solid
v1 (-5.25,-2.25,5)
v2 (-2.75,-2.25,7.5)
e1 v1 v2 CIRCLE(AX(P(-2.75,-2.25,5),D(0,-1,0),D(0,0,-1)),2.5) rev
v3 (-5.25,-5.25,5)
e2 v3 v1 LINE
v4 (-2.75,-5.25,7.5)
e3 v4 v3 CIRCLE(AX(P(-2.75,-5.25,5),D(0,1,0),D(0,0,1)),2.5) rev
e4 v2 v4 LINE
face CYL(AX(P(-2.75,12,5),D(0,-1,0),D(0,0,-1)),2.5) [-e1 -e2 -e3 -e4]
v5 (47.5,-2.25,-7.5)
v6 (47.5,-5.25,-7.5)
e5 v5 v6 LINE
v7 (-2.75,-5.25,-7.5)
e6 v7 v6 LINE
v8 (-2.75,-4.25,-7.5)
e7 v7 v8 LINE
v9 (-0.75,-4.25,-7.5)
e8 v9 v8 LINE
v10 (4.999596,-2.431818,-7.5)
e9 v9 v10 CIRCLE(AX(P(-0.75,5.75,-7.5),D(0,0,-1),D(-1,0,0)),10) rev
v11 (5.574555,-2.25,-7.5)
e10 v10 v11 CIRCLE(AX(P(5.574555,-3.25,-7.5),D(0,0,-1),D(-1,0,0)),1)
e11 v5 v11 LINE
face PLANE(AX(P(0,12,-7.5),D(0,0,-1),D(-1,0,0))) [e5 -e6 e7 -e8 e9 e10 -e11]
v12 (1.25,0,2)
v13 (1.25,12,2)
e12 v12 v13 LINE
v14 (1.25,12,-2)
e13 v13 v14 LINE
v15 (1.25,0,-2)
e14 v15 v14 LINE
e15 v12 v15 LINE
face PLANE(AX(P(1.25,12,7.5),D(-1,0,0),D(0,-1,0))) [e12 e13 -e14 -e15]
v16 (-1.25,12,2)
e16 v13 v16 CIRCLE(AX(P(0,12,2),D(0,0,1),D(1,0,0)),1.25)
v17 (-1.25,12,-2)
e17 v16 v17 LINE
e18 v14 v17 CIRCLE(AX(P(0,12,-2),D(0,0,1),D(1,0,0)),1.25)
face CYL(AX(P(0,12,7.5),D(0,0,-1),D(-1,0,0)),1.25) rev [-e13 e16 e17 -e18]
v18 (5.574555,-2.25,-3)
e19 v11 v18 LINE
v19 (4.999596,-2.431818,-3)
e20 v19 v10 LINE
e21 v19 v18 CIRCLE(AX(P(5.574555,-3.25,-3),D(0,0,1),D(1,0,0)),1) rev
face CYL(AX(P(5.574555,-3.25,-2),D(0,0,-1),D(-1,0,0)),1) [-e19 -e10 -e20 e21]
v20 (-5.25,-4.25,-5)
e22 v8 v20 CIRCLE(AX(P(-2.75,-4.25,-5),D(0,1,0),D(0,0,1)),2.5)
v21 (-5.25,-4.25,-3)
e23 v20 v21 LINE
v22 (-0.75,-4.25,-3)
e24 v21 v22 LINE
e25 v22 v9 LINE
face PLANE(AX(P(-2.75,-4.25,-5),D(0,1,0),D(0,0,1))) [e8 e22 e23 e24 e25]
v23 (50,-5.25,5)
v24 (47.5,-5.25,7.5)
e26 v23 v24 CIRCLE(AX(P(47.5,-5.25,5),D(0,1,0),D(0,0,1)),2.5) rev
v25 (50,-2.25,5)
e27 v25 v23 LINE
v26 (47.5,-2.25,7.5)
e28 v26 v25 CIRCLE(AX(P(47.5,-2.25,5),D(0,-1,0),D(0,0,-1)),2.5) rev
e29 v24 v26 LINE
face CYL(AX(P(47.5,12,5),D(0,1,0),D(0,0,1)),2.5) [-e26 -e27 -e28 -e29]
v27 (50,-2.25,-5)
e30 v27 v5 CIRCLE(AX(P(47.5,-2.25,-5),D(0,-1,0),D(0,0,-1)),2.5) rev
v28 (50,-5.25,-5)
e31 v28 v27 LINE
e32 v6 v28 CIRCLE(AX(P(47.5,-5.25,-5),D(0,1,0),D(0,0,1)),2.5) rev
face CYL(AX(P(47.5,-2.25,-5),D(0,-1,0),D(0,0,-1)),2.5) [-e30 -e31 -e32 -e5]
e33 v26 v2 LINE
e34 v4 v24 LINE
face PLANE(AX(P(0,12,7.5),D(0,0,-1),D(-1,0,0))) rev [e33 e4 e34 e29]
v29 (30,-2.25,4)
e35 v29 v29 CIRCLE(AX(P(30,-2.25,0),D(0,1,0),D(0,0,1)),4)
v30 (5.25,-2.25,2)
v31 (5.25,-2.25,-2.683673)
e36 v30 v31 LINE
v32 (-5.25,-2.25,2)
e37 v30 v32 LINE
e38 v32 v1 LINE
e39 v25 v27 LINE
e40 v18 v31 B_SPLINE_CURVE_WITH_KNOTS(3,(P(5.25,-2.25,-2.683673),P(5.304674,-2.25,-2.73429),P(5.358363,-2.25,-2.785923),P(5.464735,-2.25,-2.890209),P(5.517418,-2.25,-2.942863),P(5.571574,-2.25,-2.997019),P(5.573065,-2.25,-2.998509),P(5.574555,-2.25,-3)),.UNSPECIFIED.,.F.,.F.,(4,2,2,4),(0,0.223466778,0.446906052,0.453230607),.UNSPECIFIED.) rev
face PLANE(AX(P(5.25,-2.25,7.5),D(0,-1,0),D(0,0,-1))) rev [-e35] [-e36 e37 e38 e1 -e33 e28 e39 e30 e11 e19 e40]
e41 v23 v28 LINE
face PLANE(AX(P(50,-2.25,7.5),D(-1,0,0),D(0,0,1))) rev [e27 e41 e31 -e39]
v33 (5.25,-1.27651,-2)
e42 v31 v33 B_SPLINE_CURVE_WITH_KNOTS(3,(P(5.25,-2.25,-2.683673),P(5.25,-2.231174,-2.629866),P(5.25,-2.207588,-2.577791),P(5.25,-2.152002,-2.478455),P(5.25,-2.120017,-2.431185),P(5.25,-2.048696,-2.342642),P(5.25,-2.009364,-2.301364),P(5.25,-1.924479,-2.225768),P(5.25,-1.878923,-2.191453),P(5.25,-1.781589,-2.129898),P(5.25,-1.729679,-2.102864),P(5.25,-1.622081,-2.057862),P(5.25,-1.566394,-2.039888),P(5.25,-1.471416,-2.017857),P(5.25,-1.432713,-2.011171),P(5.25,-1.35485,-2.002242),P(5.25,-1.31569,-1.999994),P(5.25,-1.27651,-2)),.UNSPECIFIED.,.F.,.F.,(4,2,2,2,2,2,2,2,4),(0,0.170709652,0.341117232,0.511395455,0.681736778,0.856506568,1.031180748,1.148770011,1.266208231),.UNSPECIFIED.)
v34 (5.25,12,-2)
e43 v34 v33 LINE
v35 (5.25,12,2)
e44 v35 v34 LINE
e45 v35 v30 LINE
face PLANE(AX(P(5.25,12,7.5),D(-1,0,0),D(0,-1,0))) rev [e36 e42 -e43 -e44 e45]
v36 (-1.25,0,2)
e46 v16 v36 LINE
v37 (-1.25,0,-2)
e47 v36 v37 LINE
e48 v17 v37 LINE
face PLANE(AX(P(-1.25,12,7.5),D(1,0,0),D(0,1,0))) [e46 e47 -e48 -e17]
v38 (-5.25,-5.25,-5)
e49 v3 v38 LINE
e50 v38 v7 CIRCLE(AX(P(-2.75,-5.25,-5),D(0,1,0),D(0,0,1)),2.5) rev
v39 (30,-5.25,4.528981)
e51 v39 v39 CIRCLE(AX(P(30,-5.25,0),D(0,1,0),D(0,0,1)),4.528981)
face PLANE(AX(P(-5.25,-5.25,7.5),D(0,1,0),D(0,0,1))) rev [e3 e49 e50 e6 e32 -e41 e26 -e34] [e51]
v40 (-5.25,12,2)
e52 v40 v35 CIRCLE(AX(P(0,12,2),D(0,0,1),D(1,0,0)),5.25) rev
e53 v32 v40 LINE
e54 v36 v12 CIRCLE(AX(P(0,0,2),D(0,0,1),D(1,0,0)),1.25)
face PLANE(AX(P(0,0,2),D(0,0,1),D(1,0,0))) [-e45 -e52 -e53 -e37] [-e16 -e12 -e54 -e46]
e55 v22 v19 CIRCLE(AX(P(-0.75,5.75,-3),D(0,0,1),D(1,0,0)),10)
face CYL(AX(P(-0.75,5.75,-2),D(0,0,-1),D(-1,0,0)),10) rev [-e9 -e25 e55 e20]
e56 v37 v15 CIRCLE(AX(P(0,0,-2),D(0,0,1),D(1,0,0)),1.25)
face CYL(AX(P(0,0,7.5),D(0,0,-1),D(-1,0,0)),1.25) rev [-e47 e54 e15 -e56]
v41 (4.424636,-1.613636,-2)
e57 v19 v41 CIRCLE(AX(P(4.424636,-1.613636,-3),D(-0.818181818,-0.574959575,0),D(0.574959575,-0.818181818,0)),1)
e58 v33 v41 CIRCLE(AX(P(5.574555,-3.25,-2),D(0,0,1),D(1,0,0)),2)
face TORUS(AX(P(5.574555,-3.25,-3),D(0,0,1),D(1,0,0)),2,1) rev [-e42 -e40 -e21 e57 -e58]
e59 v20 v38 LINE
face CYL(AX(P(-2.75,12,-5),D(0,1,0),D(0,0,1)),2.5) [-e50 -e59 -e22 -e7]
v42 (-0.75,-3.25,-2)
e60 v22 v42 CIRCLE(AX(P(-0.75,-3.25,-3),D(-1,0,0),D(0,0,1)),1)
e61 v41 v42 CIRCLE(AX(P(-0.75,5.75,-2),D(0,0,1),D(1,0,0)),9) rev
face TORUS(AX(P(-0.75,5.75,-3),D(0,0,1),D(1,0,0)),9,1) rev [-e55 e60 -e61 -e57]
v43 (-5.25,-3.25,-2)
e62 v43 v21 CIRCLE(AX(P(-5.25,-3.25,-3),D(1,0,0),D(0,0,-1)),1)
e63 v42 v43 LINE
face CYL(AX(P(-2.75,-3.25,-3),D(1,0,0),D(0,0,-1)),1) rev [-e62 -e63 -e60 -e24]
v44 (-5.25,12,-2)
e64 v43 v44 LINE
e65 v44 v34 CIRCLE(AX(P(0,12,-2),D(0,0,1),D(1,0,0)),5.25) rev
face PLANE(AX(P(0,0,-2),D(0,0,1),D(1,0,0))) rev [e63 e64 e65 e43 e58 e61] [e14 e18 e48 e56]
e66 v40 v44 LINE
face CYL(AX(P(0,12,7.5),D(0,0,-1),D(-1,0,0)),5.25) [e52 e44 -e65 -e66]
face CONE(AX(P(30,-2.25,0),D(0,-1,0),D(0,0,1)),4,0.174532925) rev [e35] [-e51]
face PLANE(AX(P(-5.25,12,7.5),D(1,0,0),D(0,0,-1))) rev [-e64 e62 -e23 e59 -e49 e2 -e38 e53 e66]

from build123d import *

# Parameters (mm, degrees)
BOSS_EXTRUDE1_DEPTH = 7.5
CUT_EXTRUDE1_DEPTH  = 5.5
CUT_EXTRUDE2_START  = -9.5
CUT_EXTRUDE2_DEPTH  = 5.5
SKETCH3_R           = 4.000000000000006
CUT_EXTRUDE3_DEPTH  = 55.1894823743501
CUT_EXTRUDE3_DRAFT  = 10.000000000000002
FILLET1_R           = 2.5
CUT_EXTRUDE4_START  = -2
CUT_EXTRUDE4_DEPTH  = 2
FILLET2_R           = 10
FILLET5_R           = 1
FILLET3_R           = 1


with BuildPart() as part:
    # Sketch1 → Boss-Extrude1 (new, symmetric)
    with BuildSketch(Plane.XY):
        with BuildLine():
            Line((-5.249999999999999, 12), (-5.249999999999999, -5.25))
            Line((-5.249999999999999, -5.25), (50, -5.25))
            Line((50, -5.25), (50, -2.2500000000000004))
            Line((50, -2.2500000000000004), (5.250000000000001, -2.2500000000000004))
            Line((5.250000000000001, -2.2500000000000004), (5.249999999999999, 12))
            ThreePointArc((5.249999999999999, 12), (3.2e-16, 17.25), (-5.249999999999999, 12))
        make_face()
        with BuildLine():
            Line((1.2499999999999998, 12), (1.2500000000000002, 0))
            ThreePointArc((1.2500000000000002, 0), (-2.3e-16, -1.2500000000000002), (-1.2500000000000002, 0))
            Line((-1.2500000000000002, 0), (-1.2499999999999998, 12))
            ThreePointArc((-1.2499999999999998, 12), (8e-17, 13.25), (1.2499999999999998, 12))
        make_face(mode=Mode.SUBTRACT)
    extrude(amount=BOSS_EXTRUDE1_DEPTH, both=True)

    # Sketch2 → Cut-Extrude1 (cut)
    with BuildSketch(Plane.XY.offset(7.5)):
        with BuildLine():
            Line((-5.249999999999999, 12), (-5.249999999999996, -2.2500000000000018))
            Line((-5.249999999999996, -2.2500000000000018), (5.250000000000001, -2.2500000000000004))
            Line((5.250000000000001, -2.2500000000000004), (5.249999999999999, 12))
            ThreePointArc((5.249999999999999, 12), (3.2e-16, 17.25), (-5.249999999999999, 12))
        make_face()
    extrude(amount=-CUT_EXTRUDE1_DEPTH, mode=Mode.SUBTRACT)

    # Sketch2<2> → Cut-Extrude2 (cut)
    with BuildSketch(Plane.XY.offset(7.5).offset(CUT_EXTRUDE2_START)):
        with BuildLine():
            Line((-5.249999999999999, 12), (-5.249999999999996, -2.2500000000000018))
            Line((-5.249999999999996, -2.2500000000000018), (5.250000000000001, -2.2500000000000004))
            Line((5.250000000000001, -2.2500000000000004), (5.249999999999999, 12))
            ThreePointArc((5.249999999999999, 12), (3.2e-16, 17.25), (-5.249999999999999, 12))
        make_face()
    extrude(amount=-CUT_EXTRUDE2_DEPTH, mode=Mode.SUBTRACT)


with BuildPart() as cut_extrude3_tool:
    # Sketch3 → Cut-Extrude3 (with draft: the straight prism first)
    with BuildSketch(Plane(origin=(0, -2.2500000000000004, 0), x_dir=(1, 0, 0), z_dir=(0, 1, 0))):
        with Locations((30, 0)):
            Circle(SKETCH3_R)
    extrude(amount=-CUT_EXTRUDE3_DEPTH)
    # Cut-Extrude3: the draft: its side faces are tilted about the plane it starts from
    cut_extrude3_sides = [cut_extrude3_tool.faces().sort_by_distance(p)[0] for p in [
        (26, -29.844741187, 0),
    ]]
    draft(cut_extrude3_sides, Plane(origin=(0, -2.2500000000000004, 0), x_dir=(1, 0, 0), z_dir=(0, 1, 0)), CUT_EXTRUDE3_DRAFT)


with BuildPart() as part_1:
    add(part.part)

    # Cut-Extrude3: cut by cut_extrude3_tool
    add(cut_extrude3_tool.part, mode=Mode.SUBTRACT)

    # Fillet1
    fillet1_edges = [part_1.edges().sort_by_distance(p)[0] for p in [
        (50, -3.75, 7.5),
        (-5.249999999999999, -3.75, 7.5),
        (-5.249999999999999, -3.75, -7.5),
        (50, -3.75, -7.5),
    ]]
    fillet(fillet1_edges, radius=FILLET1_R)

    # Sketch4 → Cut-Extrude4 (cut)
    with BuildSketch(Plane(origin=(0, -2.2500000000000004, 0), x_dir=(1, 0, 0), z_dir=(0, 1, 0)).offset(CUT_EXTRUDE4_START)):
        with BuildLine():
            Line((5.250000000000001, 2.0000000000000018), (-5.249999999999996, 2.0000000000000018))
            Line((-5.249999999999996, 2.0000000000000018), (-5.249999999999996, 4.999999999999997))
            ThreePointArc((-5.249999999999996, 4.999999999999997), (-4.517766952966367, 6.767766952966371), (-2.7499999999999956, 7.5))
            Line((-2.7499999999999956, 7.5), (5.250000000000003, 7.5))
            Line((5.250000000000003, 7.5), (5.250000000000001, 2.0000000000000018))
        make_face()
    extrude(amount=CUT_EXTRUDE4_DEPTH, mode=Mode.SUBTRACT)

    # Fillet2
    # the kernel refuses this fillet: 10 mm, written as the material it adds along each edge
    with BuildSketch(Plane(origin=(5.250000000000003, -4.25, -7.5), x_dir=(-1.168e-13, 1, 0), z_dir=(-3.2e-16, 0, 1))) as fillet2_piece_1_section:
        with BuildLine():
            CenterArc((10.0000000000007, 5.99999999999948), FILLET2_R, 179.99999999999332, 36.869897645847004)
            Line((7.0077e-13, 6.000000000000648), (0, 0))
            Line((0, 0), (2.0000000000003118, 0))
        make_face()
    fillet2_piece_1 = extrude(amount=20.500000000001616, mode=Mode.PRIVATE)
    fillet2_piece_1 = split(fillet2_piece_1, bisect_by=Plane(origin=(2.41860221548833, -3.7558066464660698, 2), z_dir=(0, 0, -1)), keep=Keep.TOP, mode=Mode.PRIVATE)
    add(fillet2_piece_1)

    # Fillet5
    fillet5_edges = [part_1.edges().sort_by_distance(p)[0] for p in [
        (5.250000000000002, -2.2500000000000004, -4.750000000000001),
    ]]
    fillet(fillet5_edges, radius=FILLET5_R)

    # Fillet3
    # the kernel refuses this fillet: 1 mm, written as the material it adds along each edge
    with BuildSketch(Plane(origin=(-0.7499999999989999, 5.750000000001, -2.0000000000000018), x_dir=(0.5749595745759393, -0.8181818181819093, 0), z_dir=(0.8181818181819093, 0.5749595745759393, 0))) as fillet3_piece_1:
        with BuildLine():
            CenterArc((10 - FILLET3_R, FILLET3_R), FILLET3_R, 270, 90)
            Line((10 - FILLET3_R, 0), (10, 0))
            Line((10, 0), (10, FILLET3_R))
        make_face()
    revolve(axis=Axis((-0.7499999999989999, 5.750000000001, -2.0000000000000018), (0, 0, -1)), revolution_arc=35.0968012275825)
    with BuildSketch(Plane(origin=(-0.7500000000006111, -4.25, -2.0000000000000018), x_dir=(0, 0, -1), z_dir=(-1, 0, 0))) as fillet3_piece_2:
        with BuildLine():
            CenterArc((FILLET3_R, -FILLET3_R), FILLET3_R, 90, 90)
            Line((0, -FILLET3_R), (0, 0))
            Line((0, 0), (FILLET3_R, 0))
        make_face()
    extrude(amount=4.4999999999993845)
    with BuildSketch(Plane(origin=(5.574555320336334, -3.250000000000001, -2.0000000000000018), x_dir=(-0.5749595745759413, 0.818181818181908, 0), z_dir=(-0.818181818181908, -0.5749595745759413, 0))) as fillet3_piece_3_section:
        with BuildLine():
            CenterArc((1.0000000000000002 + FILLET3_R, FILLET3_R), FILLET3_R, 180, 90)
            Line((1.0000000000000002 + FILLET3_R, 0), (1.0000000000000002, 0))
            Line((1.0000000000000002, 0), (1.0000000000000002, FILLET3_R))
        make_face()
    fillet3_piece_3 = revolve(axis=Axis((5.574555320336334, -3.250000000000001, -2.0000000000000018), (0, 0, -1)), revolution_arc=178.34499823253051, mode=Mode.PRIVATE)
    fillet3_piece_3 = split(fillet3_piece_3, bisect_by=Plane(origin=(5.250000000000001, -2.3158219875897332, -2.423725348187279), z_dir=(-1, -1.2e-16, 0)), keep=Keep.TOP, mode=Mode.PRIVATE)
    add(fillet3_piece_3)
    with BuildSketch(Plane(origin=(5.574555320336334, -3.250000000000001, -2.0000000000000018), x_dir=(-0.5749595745759413, 0.818181818181908, 0), z_dir=(-0.818181818181908, -0.5749595745759413, 0))) as fillet3_piece_4_section:
        with BuildLine():
            CenterArc((1.0000000000000002 + FILLET3_R, FILLET3_R), FILLET3_R, 180, 90)
            Line((1.0000000000000002 + FILLET3_R, 0), (1.0000000000000002, 0))
            Line((1.0000000000000002, 0), (1.0000000000000002, FILLET3_R))
        make_face()
    fillet3_piece_4 = revolve(axis=Axis((5.574555320336334, -3.250000000000001, -2.0000000000000018), (0, 0, -1)), revolution_arc=178.34499823253051, mode=Mode.PRIVATE)
    fillet3_piece_4 = split(fillet3_piece_4, bisect_by=Plane(origin=(5.333721819231152, -2.2500000000000004, -2.422839116405143), z_dir=(1.3e-16, -1, 0)), keep=Keep.TOP, mode=Mode.PRIVATE)
    add(fillet3_piece_4)


solid = part_1.part
